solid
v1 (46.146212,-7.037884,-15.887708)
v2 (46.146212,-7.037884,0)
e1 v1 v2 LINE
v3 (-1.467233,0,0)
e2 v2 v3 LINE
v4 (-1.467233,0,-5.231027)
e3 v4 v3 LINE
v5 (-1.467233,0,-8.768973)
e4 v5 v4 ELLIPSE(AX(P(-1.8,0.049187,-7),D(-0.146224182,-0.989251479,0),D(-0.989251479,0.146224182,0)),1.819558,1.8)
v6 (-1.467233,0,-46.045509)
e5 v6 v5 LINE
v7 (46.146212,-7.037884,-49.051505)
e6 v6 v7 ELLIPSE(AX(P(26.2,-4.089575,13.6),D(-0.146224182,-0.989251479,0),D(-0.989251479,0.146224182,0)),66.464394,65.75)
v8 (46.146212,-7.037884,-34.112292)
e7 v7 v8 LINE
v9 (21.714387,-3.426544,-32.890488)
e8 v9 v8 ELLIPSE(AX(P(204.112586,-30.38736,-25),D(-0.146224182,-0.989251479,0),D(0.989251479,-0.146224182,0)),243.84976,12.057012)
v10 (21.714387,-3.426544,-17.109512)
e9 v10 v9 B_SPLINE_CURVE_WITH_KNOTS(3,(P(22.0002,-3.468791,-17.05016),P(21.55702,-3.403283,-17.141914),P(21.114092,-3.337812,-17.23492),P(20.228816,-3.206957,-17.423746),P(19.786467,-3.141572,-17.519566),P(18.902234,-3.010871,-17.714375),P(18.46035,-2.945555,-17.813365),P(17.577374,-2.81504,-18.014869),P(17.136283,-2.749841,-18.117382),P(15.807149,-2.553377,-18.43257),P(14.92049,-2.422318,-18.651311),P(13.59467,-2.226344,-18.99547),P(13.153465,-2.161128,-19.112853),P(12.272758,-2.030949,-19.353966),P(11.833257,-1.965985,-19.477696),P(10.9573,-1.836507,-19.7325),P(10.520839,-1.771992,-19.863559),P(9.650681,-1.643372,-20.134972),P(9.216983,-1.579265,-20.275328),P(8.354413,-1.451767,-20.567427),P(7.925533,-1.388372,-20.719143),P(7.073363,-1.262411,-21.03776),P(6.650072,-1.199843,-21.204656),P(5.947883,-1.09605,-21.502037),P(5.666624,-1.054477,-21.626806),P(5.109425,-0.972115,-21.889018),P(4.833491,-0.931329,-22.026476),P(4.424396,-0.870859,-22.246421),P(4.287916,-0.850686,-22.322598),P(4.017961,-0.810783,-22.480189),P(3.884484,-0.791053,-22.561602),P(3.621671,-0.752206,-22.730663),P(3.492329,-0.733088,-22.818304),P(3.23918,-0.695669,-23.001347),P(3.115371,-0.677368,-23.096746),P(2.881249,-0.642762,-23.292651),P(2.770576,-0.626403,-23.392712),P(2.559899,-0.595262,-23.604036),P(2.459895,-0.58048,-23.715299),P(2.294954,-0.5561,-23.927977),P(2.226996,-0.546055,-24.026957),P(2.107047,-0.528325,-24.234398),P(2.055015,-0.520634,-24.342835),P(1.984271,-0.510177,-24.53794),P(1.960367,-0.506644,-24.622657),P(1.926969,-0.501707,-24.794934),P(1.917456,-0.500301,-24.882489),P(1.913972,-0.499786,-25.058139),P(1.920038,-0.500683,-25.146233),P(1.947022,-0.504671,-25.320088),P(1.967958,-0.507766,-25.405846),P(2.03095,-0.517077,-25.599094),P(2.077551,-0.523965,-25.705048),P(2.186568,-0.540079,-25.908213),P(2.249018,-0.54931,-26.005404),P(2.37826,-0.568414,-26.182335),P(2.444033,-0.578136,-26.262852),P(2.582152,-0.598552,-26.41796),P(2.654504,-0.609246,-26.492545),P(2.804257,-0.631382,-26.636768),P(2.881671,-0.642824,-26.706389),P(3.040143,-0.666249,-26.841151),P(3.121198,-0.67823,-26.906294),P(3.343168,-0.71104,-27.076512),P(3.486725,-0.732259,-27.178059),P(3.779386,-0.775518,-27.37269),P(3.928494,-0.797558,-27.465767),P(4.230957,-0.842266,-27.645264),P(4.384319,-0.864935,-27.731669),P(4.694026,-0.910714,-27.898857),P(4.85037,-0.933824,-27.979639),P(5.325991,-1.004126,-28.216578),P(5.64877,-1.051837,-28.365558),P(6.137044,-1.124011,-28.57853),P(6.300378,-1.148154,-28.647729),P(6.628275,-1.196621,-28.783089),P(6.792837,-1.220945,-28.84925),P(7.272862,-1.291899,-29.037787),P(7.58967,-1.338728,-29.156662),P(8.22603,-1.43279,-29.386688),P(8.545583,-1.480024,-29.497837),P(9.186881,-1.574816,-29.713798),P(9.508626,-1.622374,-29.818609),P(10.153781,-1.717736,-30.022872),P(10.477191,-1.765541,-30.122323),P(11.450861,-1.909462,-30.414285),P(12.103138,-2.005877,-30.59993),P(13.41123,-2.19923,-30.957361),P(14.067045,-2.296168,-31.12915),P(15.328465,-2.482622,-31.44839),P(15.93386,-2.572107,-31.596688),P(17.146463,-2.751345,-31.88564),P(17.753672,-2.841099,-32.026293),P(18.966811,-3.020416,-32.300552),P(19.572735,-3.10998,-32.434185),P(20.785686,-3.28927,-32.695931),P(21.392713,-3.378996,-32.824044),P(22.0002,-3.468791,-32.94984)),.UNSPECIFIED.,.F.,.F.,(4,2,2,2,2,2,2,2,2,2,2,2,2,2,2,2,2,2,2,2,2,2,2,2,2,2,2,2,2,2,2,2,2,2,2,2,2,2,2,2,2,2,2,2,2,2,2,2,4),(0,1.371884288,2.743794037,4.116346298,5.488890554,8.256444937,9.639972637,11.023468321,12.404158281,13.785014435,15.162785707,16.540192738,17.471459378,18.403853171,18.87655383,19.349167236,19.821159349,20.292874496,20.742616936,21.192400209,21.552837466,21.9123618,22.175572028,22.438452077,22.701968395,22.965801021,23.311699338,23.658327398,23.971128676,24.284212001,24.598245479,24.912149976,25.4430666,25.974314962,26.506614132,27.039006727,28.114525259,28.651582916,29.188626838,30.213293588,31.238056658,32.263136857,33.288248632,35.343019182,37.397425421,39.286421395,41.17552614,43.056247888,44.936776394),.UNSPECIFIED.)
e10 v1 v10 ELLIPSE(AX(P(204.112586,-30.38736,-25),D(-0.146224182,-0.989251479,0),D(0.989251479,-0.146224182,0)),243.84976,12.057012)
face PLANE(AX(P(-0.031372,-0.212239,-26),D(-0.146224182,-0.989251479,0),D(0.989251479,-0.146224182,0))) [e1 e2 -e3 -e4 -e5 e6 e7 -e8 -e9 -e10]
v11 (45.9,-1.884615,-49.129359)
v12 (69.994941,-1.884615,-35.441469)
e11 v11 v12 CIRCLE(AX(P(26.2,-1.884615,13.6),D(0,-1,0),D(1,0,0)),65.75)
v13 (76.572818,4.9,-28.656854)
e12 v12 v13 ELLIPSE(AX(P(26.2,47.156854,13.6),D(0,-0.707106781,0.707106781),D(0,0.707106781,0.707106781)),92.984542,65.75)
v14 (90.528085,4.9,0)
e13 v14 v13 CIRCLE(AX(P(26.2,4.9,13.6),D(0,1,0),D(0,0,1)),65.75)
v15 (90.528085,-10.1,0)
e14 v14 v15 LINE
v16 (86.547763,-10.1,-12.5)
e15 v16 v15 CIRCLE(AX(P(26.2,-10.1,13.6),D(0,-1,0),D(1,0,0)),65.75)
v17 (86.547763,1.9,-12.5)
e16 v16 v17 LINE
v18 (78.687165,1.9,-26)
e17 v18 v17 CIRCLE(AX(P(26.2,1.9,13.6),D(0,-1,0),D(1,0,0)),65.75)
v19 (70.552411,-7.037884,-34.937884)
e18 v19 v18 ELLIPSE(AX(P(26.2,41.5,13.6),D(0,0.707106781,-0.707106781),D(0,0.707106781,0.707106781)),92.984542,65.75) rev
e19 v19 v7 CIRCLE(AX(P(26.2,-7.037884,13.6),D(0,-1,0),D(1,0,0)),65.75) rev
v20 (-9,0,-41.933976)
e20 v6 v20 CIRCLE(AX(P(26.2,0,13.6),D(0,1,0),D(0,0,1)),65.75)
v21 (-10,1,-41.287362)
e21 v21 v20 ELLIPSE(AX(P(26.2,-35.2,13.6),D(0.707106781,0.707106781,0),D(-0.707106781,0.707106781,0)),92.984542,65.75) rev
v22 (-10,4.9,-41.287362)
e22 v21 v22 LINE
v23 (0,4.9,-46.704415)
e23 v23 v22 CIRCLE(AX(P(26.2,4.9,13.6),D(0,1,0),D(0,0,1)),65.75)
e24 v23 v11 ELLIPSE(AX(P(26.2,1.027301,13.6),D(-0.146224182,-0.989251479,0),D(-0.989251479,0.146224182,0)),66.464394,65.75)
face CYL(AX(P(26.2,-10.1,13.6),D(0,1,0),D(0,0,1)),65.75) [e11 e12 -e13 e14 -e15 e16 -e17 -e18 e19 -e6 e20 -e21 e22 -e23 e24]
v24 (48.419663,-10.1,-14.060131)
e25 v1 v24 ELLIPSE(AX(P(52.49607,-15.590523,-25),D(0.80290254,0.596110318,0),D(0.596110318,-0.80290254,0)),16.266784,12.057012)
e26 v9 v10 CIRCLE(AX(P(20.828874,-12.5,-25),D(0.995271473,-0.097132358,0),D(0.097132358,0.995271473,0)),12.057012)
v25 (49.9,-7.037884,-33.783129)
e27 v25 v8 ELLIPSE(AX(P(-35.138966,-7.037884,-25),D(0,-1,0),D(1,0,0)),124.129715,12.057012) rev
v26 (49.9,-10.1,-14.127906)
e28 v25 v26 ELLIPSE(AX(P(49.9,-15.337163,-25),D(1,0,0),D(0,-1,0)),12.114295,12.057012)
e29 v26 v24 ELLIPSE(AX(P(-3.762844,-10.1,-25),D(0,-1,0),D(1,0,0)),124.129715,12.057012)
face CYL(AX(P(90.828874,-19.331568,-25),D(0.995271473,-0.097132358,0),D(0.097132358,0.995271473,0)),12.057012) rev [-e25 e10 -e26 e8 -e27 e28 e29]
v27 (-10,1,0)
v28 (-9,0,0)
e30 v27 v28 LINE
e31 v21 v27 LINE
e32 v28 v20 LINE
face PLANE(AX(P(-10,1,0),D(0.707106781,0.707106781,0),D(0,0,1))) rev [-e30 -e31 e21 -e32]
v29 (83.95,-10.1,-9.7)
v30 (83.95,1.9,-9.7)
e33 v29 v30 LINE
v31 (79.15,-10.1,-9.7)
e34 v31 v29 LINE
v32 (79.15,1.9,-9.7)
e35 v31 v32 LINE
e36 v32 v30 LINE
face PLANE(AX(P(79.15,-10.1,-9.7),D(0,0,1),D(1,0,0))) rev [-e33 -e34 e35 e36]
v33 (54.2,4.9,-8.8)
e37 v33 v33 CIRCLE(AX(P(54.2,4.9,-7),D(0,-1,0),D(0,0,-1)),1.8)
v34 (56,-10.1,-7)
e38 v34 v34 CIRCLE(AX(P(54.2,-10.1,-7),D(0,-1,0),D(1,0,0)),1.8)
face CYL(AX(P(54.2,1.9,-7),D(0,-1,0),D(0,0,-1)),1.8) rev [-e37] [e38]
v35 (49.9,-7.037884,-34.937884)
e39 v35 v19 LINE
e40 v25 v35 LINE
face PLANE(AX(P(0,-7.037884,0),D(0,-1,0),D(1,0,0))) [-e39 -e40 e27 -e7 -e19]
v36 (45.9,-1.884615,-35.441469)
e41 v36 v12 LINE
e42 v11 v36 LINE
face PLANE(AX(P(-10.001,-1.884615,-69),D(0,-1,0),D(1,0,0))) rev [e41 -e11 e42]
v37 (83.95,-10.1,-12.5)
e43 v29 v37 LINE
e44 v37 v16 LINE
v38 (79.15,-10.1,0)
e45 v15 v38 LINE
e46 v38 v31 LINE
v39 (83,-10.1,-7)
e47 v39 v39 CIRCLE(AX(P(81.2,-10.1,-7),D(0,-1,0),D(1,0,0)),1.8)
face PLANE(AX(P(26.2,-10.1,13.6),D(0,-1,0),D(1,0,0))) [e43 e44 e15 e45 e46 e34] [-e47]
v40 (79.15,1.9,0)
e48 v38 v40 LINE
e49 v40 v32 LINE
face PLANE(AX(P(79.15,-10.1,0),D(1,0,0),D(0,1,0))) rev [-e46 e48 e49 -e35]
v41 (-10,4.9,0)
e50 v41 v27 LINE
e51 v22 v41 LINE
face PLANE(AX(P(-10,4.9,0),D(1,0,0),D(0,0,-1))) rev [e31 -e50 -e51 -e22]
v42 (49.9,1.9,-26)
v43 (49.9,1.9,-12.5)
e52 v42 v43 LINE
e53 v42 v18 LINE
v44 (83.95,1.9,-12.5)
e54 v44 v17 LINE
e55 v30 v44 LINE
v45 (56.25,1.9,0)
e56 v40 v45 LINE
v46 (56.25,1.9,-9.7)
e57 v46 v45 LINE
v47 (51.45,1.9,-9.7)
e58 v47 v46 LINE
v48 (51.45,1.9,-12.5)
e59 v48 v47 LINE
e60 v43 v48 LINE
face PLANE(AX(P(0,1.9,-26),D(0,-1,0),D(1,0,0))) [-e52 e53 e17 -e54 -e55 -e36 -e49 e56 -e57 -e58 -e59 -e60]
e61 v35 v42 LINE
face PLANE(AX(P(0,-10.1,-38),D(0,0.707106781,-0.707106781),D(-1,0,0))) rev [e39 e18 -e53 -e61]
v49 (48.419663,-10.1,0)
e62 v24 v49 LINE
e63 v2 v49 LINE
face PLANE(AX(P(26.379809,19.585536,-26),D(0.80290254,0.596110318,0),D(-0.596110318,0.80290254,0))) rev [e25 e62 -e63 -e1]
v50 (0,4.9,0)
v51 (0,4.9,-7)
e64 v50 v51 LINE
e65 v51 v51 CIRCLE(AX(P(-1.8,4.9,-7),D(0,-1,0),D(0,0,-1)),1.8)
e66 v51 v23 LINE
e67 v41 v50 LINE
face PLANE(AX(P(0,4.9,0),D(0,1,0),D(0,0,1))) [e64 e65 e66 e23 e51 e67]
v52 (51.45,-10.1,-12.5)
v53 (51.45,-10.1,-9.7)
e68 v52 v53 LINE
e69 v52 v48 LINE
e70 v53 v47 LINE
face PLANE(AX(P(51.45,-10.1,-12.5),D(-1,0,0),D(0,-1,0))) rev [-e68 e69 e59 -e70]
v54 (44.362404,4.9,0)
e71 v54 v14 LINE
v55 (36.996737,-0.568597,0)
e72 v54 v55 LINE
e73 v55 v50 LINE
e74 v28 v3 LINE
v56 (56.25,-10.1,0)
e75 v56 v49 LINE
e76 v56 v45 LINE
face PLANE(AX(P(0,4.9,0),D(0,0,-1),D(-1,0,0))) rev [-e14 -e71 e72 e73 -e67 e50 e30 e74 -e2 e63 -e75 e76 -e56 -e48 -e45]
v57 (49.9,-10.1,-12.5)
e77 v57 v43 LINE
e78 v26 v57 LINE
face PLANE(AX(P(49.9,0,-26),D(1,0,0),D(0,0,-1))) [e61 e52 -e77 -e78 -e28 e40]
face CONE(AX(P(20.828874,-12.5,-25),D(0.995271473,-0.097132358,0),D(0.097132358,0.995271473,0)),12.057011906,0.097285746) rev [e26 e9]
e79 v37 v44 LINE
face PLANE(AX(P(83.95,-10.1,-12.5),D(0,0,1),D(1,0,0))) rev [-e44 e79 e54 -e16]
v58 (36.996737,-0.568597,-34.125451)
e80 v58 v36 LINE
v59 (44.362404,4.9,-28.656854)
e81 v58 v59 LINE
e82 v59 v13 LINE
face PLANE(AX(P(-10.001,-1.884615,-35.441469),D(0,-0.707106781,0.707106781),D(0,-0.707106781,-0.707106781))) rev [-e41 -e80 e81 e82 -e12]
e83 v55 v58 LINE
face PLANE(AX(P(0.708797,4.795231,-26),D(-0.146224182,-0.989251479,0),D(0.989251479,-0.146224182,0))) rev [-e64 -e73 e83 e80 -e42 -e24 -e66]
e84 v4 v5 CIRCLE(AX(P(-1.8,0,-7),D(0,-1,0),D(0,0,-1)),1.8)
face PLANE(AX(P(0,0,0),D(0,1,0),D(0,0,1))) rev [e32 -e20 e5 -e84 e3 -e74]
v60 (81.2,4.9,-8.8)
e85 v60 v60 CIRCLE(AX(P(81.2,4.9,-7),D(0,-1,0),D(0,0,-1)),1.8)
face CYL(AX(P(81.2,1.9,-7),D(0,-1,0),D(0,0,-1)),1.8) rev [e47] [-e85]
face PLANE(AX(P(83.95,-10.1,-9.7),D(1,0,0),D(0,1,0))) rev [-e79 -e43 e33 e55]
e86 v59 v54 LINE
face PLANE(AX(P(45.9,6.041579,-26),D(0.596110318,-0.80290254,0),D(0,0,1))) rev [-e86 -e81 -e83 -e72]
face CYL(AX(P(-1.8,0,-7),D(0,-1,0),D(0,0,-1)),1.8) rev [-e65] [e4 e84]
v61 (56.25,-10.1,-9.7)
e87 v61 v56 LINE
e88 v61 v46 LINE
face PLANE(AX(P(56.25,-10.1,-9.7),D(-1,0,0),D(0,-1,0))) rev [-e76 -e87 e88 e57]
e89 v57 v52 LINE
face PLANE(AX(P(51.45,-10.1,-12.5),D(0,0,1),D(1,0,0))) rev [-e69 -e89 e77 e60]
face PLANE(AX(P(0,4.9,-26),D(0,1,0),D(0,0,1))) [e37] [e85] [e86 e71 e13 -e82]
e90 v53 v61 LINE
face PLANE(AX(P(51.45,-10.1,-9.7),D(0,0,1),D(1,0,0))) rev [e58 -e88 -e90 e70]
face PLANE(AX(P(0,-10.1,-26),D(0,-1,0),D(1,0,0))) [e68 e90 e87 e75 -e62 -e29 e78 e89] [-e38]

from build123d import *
from build123d.topology import SkipClean

# Parameters (mm, degrees)
SKETCH1_W            = 10
SKETCH1_H            = 10
BOSS_EXTRUDE1_DEPTH  = 4.9
CHAMFER1_SIZE        = 1
BOSS_EXTRUDE2_DEPTH  = 16
BOSS_EXTRUDE3_DEPTH  = 10
BOSS_EXTRUDE4_DEPTH  = 13
CHAMFER2_SIZE        = 12
BOSS_EXTRUDE5_DEPTH  = 30
CUT_EXTRUDE2_REACH   = 128.798
CUT_EXTRUDE1_START   = -15
CUT_EXTRUDE1_DEPTH   = 15
M3_CLEARANCE_HOLE1_D = 3.6
SKETCH11_W           = 1.8
SKETCH11_H           = 4.9
CHAMFER3_SIZE        = 9
CHAMFER3_SIZE_2      = 7.926193673
SKETCH14_R           = 1.8
BOSS_EXTRUDE6_DEPTH  = 12
M3_CLEARANCE_HOLE3_D = 3.6
SKETCH19_W           = 25
SKETCH19_H           = 20
CUT_EXTRUDE3_DEPTH   = 3.062116


# Read off the part's stored shape, not the designer's step: Cut-Extrude1
# Some blends are built 0.0001 mm under size
with BuildPart() as part:
    # Sketch1 → Boss-Extrude1 (new body)
    with BuildSketch(Plane(origin=(0, 0, 0), x_dir=(1, 0, 0), z_dir=(0, 1, 0))):
        with Locations((-5, 5)):
            Rectangle(SKETCH1_W, SKETCH1_H)
    extrude(amount=BOSS_EXTRUDE1_DEPTH)

    # Chamfer1
    chamfer1_edges = [part.edges().sort_by_distance(p)[0] for p in [
        (-10, 0, -5),
    ]]
    chamfer(chamfer1_edges, length=CHAMFER1_SIZE)

    # Sketch2 → Boss-Extrude2 (add)
    with BuildSketch(Plane(origin=(0, 0, -10), x_dir=(-1, 0, 0), z_dir=(0, 0, -1))):
        Polygon((-49.9, -10.1), (-48.419662682, -10.1), (-46.146212445, -7.037883957), (1.467233005, 0), (9, 0), (10, 1), (10, 4.9), (0, 4.9), (-45.9, -1.884614526), (-45.9, 4.9), (-95.9, 4.9), (-95.9, 1.9), (-49.9, 1.9), align=None)
    extrude(amount=BOSS_EXTRUDE2_DEPTH)

    # Sketch2<4> → Boss-Extrude3 (add)
    with BuildSketch(Plane(origin=(0, 0, -10), x_dir=(-1, 0, 0), z_dir=(0, 0, -1))):
        Polygon((-49.9, -10.1), (-48.419662682, -10.1), (-46.146212445, -7.037883957), (1.467233005, 0), (0, 0), (0, 4.9), (-45.9, -1.884614526), (-45.9, 4.9), (-95.9, 4.9), (-95.9, 1.9), (-49.9, 1.9), align=None)
    extrude(amount=-BOSS_EXTRUDE3_DEPTH)

    # Sketch3 → Boss-Extrude4 (add)
    with BuildSketch(Plane(origin=(0, 0, -26), x_dir=(-1, 0, 0), z_dir=(0, 0, -1))):
        Polygon((-95.9, 1.9), (-95.9, -10.1), (-49.9, -10.1), (-48.419662682, -10.1), (-46.146212445, -7.037883957), (1.467233005, 0), (9, 0), (10, 1), (10, 4.9), (0, 4.9), (-45.9, -1.884614526), (-45.9, 4.9), (-95.9, 4.9), align=None)
    extrude(amount=BOSS_EXTRUDE4_DEPTH)

    # Chamfer2
    chamfer2_edges = [part.edges().sort_by_distance(p)[0] for p in [
        (72.9, -10.1, -26),
    ]]
    chamfer(chamfer2_edges, length=CHAMFER2_SIZE - 0.0001)  # a hair under: the kernel refuses the full size

    # Sketch4 → Boss-Extrude5 (add)
    with BuildSketch(Plane(origin=(0, 0, -39), x_dir=(-1, 0, 0), z_dir=(0, 0, -1))):
        Polygon((-95.9, 4.9), (-95.9, -10.1), (-48.419662682, -10.1), (-46.146212445, -7.037883957), (1.467233005, 0), (9, 0), (10, 1), (10, 4.9), (0, 4.9), (-45.9, -1.884614526), (-45.9, 4.9), align=None)
    extrude(amount=BOSS_EXTRUDE5_DEPTH)

    # Sketch15 → Cut-Extrude2 (cut, up to next)
    with BuildSketch(Plane(origin=(95.9, 0, 0), x_dir=(0, 0, -1), z_dir=(1, 0, 0)), mode=Mode.PRIVATE) as cut_extrude2_sk1:
        Polygon((69, -1.884614526), (35.441468776, -1.884614526), (28.656854249, 4.9), (69, 4.9), align=None)
    cut_extrude2_tool1 = extrude(cut_extrude2_sk1.sketch, amount=-CUT_EXTRUDE2_REACH, mode=Mode.PRIVATE) & part.part
    add(cut_extrude2_tool1.solids().sort_by_distance((95.9, 1.611504, -50.472675))[0], mode=Mode.SUBTRACT)

    # Cut-Extrude1 outline → Cut-Extrude1 (cut)
    with BuildSketch(Plane(origin=(0, 4.9, 0), x_dir=(1, 0, 0), z_dir=(0, 1, 0)).offset(CUT_EXTRUDE1_START)):
        with BuildLine():
            ThreePointArc((-10, 41.287361933), (51.179168383, 47.220256879), (90.528084846, 0))
            Line((90.528084846, 0), (95.9, 0))
            Line((95.9, 0), (95.9, 69))
            Line((95.9, 69), (-10, 69))
            Line((-10, 69), (-10, 41.287361933))
        make_face()
    extrude(amount=CUT_EXTRUDE1_DEPTH, mode=Mode.SUBTRACT)

    # M3 Clearance Hole1 (through all)
    with Locations(Plane(origin=(0, 1.9, 0), x_dir=(-1, 0, 0), z_dir=(0, -1, 0))):
        with Locations((-81.2, 7), (-54.2, 7)):
            Hole(M3_CLEARANCE_HOLE1_D / 2)

    # Sketch11 → M3 Clearance Hole2 (revolve, cut)
    with BuildSketch(Plane(origin=(-1.8, 0, -7), x_dir=(0, 0, -1), z_dir=(1, 0, 0))):
        with Locations((0.9, 2.45)):
            Rectangle(SKETCH11_W, SKETCH11_H)
    revolve(axis=Axis((-1.8, -6.35, -7), (0, 1, 0)), mode=Mode.SUBTRACT)

    # Chamfer3
    # the kernel refuses this chamfer: 9, 7.926193673 mm, written as the material it adds along each edge
    with BuildSketch(Plane(origin=(45.9, -1.884614526, -35.441468776), x_dir=(-0.9928980217571691, 0.11896856051369163, 0), z_dir=(0, 0, 1))) as chamfer3_piece_1_section:
        Polygon((CHAMFER3_SIZE * 0.999621916911, -CHAMFER3_SIZE * 0.0274958766106), (CHAMFER3_SIZE_2 * 0.118968560518, -CHAMFER3_SIZE_2 * 0.992898021792), (0, 0), align=None)
    chamfer3_piece_1 = extrude(amount=35.441468776, mode=Mode.PRIVATE)
    chamfer3_piece_1 = split(chamfer3_piece_1, bisect_by=Plane(origin=(42.836377778, 4.9, -16.273200987), z_dir=(0, -1, 0)), keep=Keep.TOP, mode=Mode.PRIVATE)
    chamfer3_piece_1 = split(chamfer3_piece_1, bisect_by=Plane(origin=(42.836377778, 9.147052769, -24.40980148), z_dir=(6.542051911182403e-15, -0.7071067811865479, 0.7071067811865472)), keep=Keep.TOP, mode=Mode.PRIVATE)
    add(chamfer3_piece_1)

    # Sketch12 → Cut-Revolve1 (revolve, cut)
    with BuildSketch(Plane.XY.offset(-25)):
        Polygon((0, -0.5), (22, -0.5), (92, -7.331568331), (90.828874, -19.331568331), (0, -10.467230343), align=None)
    revolve(axis=Axis((90.828874, -19.331568331, -25), (-0.9952714730097288, 0.09713235821828223, 0)), mode=Mode.SUBTRACT)

    # Sketch14 → Boss-Extrude6 (add)
    # profile 1 of 2: a face of its own
    with SkipClean():  # the faces are left unmerged after this step: merging them gives an invalid solid
        with BuildSketch(Plane.XZ.offset(-1.9)):
            with BuildLine():
                Line((83.95, -12.5), (86.547763007, -12.5))
                ThreePointArc((86.547763007, -12.5), (88.850452987, -6.3495173), (90.528084846, 0))
                Line((90.528084846, 0), (79.15, 0))
                Line((79.15, 0), (79.15, -9.7))
                Line((79.15, -9.7), (83.95, -9.7))
                Line((83.95, -9.7), (83.95, -12.5))
            make_face()
            with Locations(Location((81.2, -7, 0), (0, 0, 270))):
                Circle(SKETCH14_R, mode=Mode.SUBTRACT)
        # profile 2 of 2: a face of its own
        with BuildSketch(Plane.XZ.offset(-1.9)):
            Polygon((49.9, 0), (49.9, -12.5), (51.45, -12.5), (51.45, -9.7), (56.25, -9.7), (56.25, 0), align=None)
            with Locations(Location((54.2, -7, 0), (0, 0, 270))):
                Circle(SKETCH14_R, mode=Mode.SUBTRACT)
        extrude(amount=BOSS_EXTRUDE6_DEPTH)
    add(part.part.scale(1), mode=Mode.REPLACE)  # the faces are merged on a copy

    # M3 Clearance Hole3 (through all)
    with Locations(Plane(origin=(0, 4.9, 0), x_dir=(1, 0, 0), z_dir=(0, 1, 0))):
        with Locations((-1.8, 7)):
            Hole(M3_CLEARANCE_HOLE3_D / 2)

    # Sketch19 → Cut-Extrude3 (cut)
    with BuildSketch(Plane.XZ.offset(10.1)):
        with Locations((58.646212445, -40)):
            Rectangle(SKETCH19_W, SKETCH19_H)
    extrude(amount=-CUT_EXTRUDE3_DEPTH, mode=Mode.SUBTRACT)


solid = part.part
